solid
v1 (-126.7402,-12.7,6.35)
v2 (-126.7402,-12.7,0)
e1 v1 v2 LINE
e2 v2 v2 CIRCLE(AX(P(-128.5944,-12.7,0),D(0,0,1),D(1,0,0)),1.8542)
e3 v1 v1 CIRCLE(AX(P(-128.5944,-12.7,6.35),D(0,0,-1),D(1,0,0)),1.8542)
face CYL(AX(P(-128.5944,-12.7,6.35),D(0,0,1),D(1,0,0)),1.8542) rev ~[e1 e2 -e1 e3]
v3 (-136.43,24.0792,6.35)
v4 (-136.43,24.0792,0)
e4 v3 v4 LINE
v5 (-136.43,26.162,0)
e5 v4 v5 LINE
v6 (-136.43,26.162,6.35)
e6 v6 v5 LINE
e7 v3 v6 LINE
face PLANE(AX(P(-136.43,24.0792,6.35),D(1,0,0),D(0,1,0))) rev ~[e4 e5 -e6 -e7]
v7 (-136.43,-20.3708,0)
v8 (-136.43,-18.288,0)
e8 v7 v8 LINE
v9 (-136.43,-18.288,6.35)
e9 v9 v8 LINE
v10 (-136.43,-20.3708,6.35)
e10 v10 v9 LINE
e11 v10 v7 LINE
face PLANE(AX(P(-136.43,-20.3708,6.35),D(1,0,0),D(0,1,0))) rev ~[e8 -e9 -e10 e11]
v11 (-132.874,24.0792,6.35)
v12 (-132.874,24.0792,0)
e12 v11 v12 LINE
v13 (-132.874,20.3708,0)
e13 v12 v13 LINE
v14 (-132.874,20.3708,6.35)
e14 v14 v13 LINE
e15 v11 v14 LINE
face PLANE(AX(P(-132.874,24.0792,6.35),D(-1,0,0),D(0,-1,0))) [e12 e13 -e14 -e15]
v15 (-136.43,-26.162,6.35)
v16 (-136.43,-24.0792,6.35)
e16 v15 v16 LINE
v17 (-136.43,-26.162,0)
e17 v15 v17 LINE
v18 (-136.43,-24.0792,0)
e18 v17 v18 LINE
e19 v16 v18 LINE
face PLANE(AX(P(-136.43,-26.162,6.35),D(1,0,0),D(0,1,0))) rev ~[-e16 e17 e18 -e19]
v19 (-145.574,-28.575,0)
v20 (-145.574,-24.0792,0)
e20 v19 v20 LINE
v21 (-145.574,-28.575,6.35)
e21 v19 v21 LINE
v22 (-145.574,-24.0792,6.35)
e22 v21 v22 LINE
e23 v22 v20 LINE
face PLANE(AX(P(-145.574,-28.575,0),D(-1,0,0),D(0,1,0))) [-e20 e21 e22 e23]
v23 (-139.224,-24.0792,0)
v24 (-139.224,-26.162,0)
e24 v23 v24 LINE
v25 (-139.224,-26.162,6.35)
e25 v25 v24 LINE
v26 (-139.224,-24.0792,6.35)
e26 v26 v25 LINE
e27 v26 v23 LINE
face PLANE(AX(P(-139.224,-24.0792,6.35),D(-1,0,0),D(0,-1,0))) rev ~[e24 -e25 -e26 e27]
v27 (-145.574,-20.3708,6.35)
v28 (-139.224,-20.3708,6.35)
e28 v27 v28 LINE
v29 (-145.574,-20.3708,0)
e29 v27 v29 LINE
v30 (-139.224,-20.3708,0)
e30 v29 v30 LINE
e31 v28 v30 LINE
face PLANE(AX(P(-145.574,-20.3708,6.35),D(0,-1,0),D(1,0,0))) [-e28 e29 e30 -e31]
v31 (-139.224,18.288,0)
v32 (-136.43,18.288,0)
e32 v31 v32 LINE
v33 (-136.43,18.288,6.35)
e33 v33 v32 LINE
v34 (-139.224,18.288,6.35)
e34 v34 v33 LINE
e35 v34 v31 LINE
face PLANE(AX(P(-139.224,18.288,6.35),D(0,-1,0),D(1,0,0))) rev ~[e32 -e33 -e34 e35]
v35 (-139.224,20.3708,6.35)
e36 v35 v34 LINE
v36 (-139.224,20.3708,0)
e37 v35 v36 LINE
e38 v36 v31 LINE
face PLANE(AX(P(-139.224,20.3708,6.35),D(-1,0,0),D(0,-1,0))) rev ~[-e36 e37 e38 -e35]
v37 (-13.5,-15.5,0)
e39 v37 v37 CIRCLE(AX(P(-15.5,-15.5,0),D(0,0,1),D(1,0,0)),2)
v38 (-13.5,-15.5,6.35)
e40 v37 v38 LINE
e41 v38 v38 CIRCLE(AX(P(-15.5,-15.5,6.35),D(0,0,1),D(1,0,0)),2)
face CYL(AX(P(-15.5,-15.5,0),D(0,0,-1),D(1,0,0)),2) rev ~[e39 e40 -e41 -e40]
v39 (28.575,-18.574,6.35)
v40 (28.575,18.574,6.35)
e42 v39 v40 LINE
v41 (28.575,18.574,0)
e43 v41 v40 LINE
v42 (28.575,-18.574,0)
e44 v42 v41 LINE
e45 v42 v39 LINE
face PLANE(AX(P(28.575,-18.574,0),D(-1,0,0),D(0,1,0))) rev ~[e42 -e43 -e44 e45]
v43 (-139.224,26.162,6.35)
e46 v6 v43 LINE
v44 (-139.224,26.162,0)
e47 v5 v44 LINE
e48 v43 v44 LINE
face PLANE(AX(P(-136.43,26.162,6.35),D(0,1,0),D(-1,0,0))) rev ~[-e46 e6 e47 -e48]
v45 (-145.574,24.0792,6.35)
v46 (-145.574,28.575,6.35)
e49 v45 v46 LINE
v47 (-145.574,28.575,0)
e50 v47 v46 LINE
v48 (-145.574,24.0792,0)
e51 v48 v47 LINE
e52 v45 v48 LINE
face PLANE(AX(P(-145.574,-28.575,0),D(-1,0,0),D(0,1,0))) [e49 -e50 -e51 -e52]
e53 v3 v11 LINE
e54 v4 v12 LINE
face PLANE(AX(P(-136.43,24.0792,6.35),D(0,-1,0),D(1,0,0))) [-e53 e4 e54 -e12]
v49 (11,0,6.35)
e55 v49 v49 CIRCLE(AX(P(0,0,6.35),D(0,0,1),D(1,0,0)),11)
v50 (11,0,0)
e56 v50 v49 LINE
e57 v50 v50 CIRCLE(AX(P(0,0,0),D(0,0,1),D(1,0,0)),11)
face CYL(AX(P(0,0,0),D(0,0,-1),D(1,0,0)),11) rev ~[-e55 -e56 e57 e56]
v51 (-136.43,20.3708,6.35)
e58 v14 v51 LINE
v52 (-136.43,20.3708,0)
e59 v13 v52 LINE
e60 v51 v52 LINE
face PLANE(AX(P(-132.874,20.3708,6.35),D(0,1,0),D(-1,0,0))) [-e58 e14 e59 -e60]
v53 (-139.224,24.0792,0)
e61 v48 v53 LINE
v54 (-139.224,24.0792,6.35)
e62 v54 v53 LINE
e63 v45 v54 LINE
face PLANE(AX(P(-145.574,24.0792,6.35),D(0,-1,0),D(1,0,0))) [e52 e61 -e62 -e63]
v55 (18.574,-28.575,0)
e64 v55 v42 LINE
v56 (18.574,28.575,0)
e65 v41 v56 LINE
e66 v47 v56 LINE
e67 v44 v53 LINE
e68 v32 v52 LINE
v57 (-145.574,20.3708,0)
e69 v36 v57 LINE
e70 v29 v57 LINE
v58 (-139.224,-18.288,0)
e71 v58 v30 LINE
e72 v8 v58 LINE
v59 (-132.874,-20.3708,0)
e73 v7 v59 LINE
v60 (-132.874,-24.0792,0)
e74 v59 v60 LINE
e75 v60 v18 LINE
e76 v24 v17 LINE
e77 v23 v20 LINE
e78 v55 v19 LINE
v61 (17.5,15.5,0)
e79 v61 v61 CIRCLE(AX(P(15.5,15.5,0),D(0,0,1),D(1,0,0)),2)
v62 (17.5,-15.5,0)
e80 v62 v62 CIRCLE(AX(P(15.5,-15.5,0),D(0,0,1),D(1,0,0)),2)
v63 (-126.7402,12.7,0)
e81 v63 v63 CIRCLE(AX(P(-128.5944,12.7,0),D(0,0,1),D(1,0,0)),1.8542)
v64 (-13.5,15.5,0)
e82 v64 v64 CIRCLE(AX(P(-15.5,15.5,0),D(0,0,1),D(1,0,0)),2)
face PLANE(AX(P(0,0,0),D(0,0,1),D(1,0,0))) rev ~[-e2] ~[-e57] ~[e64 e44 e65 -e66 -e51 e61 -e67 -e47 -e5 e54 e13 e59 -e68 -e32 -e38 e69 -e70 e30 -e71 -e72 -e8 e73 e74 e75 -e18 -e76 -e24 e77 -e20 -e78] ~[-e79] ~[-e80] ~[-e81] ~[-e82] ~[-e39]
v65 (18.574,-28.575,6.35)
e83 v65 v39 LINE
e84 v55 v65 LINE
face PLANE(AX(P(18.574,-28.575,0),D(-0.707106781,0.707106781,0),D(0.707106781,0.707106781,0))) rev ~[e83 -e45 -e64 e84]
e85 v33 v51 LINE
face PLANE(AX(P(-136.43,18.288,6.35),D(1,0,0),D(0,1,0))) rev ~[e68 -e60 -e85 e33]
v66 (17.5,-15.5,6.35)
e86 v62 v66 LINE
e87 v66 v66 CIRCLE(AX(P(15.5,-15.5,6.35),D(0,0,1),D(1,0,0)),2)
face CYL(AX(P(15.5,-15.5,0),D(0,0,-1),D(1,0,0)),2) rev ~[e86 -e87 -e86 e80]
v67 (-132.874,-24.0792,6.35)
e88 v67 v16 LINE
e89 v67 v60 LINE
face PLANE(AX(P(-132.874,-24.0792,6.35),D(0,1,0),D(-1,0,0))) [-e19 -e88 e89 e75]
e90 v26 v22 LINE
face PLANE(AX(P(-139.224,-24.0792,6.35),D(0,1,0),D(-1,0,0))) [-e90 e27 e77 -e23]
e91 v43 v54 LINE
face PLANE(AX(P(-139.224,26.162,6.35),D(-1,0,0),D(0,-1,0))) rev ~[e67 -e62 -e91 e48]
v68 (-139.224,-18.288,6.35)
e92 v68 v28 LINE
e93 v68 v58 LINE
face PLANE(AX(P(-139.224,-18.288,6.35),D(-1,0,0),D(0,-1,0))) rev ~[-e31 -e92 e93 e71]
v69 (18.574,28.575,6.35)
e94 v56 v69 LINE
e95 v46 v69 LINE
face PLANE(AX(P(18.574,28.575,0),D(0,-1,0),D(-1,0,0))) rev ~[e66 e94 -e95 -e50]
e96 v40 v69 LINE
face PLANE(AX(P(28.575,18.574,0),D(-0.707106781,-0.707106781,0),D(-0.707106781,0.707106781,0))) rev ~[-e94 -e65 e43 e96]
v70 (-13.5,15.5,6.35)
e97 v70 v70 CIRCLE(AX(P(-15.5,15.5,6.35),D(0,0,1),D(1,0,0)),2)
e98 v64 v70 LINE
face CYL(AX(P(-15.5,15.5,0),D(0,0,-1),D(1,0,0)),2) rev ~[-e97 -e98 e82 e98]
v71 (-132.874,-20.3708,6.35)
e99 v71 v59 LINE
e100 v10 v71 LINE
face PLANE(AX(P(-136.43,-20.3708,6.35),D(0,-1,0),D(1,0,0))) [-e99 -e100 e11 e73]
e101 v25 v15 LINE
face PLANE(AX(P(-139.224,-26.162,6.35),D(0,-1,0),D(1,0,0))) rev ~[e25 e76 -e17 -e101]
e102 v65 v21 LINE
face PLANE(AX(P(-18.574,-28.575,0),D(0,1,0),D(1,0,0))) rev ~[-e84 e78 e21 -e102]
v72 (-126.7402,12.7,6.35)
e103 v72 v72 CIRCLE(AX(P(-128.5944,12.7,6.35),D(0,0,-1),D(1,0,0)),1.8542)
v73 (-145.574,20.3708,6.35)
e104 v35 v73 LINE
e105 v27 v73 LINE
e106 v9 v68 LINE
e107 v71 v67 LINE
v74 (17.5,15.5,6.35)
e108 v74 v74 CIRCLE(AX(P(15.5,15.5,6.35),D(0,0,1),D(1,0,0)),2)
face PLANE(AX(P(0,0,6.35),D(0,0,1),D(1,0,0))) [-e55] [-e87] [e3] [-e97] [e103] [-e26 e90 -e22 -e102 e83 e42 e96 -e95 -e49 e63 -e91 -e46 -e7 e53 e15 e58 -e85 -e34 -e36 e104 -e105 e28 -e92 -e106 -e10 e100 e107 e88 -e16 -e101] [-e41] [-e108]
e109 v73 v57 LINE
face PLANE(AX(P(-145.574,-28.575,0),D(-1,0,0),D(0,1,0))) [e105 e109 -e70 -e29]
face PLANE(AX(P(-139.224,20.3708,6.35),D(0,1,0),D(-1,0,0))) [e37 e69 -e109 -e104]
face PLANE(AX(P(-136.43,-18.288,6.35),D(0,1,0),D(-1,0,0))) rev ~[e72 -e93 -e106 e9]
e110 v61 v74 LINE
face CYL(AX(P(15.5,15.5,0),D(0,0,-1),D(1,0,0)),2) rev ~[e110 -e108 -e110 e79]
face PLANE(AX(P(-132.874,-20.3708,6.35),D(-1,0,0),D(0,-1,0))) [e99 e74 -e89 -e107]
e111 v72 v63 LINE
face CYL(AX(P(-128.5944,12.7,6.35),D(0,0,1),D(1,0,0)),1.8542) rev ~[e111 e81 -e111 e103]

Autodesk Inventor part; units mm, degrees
ref_plane "YZ Plane" through (0, 0, 0) normal (1, 0, 0) x (0, 1, 0)
ref_plane "XZ Plane" through (0, 0, 0) normal (0, 1, 0) x (-1, 0, 0)
ref_plane "XY Plane" through (0, 0, 0) normal (0, 0, 1) x (1, 0, 0)
sketch "Sketch1" plane through (0, 0, 0) normal (0, 0, 1) x (1, 0, 0)
  circle A0 centre (15.5, -15.5) radius 2 projected
  circle A1 centre (-15.5, -15.5) radius 2 projected
  circle A2 centre (15.5, 15.5) radius 2 projected
  circle A3 centre (-15.5, 15.5) radius 2 projected
  line L0 (-21.15, 15.4985) -> (-15.4985, 21.15) projected
  line L1 (-15.4985, 21.15) -> (15.4985, 21.15) projected
  line L2 (15.4985, 21.15) -> (21.15, 15.4985) projected
  line L3 (21.15, 15.4985) -> (21.15, -15.4985) projected
  line L4 (21.15, -15.4985) -> (15.4985, -21.15) projected
  line L5 (15.4985, -21.15) -> (-15.4985, -21.15) projected
  line L6 (-15.4985, -21.15) -> (-21.15, -15.4985) projected
  line L7 (-21.15, -15.4985) -> (-21.15, 15.4985) projected
  line L8 (28.575, -18.574) -> (28.575, 18.574)
  line L9 (28.575, 18.574) -> (18.574, 28.575)
  line L10 (18.574, 28.575) -> (-18.574, 28.575)
  line L11 (-18.574, 28.575) -> (-28.575, 18.574)
  line L12 (-28.575, 18.574) -> (-28.575, -18.574)
  line L13 (-28.575, -18.574) -> (-18.574, -28.575)
  line L14 (-18.574, -28.575) -> (18.574, -28.575)
  line L15 (18.574, -28.575) -> (28.575, -18.574)
  line L16 (-18.574, -28.575) -> (-145.574, -28.575)
  line L17 (-145.574, -28.575) -> (-145.574, 28.575)
  line L18 (-145.574, 28.575) -> (-18.574, 28.575)
  line L19 (-18.574, 28.575) -> (-18.574, -28.575)
  circle A4 centre (0, 0) radius 11 projected
  dimension "d0" = 127
  dimension "d1" = 57.15
  dimension "d2" = 57.15
extrude "Extrusion1" add sketch "Sketch1" along normal blind 6.35
sketch "Sketch2" plane through (0, 0, 6.35) normal (0, 0, 1) x (1, 0, 0)
  line L0 (-130.4486, -16.3493) -> (-130.4486, -9.9993) projected
  line L1 (-126.7402, -9.9993) -> (-126.7402, -16.3493) projected
  line L2 (-130.4486, 9.0507) -> (-130.4486, 15.4007) projected
  line L3 (-126.7402, 15.4007) -> (-126.7402, 9.0507) projected
  line L4 (-126.7402, 12.7) -> (-130.4486, 12.7) construction
  line L5 (-126.7402, -12.7) -> (-130.9009, -12.7) construction
  circle A0 centre (-128.5944, 12.7) radius 1.8542
  circle A1 centre (-128.5944, -12.7) radius 1.8542
  dimension "d5" = 3.7084
  dimension "d6" = 3.7084
extrude "Extrusion2" cut sketch "Sketch2" against normal through all
sketch "Sketch3" plane through (0, 0, 6.35) normal (0, 0, 1) x (1, 0, 0)
  line L0 (-145.574, -28.575) -> (-145.574, 28.575) projected
  line L1 (-151.924, 20.3708) -> (-151.924, 24.0792) projected
  line L2 (-151.924, -24.5535) -> (-151.924, -20.8451) projected
  line L3 (-131.1543, 22.225) -> (-145.574, 22.225) construction
  line L4 (-131.1543, -22.225) -> (-145.574, -22.225) construction
  line L5 (-145.574, -20.3708) -> (-132.874, -20.3708)
  line L6 (-132.874, -20.3708) -> (-132.874, -24.0792)
  line L7 (-132.874, -24.0792) -> (-145.574, -24.0792)
  line L8 (-145.574, -24.0792) -> (-145.574, -20.3708)
  line L9 (-145.574, 24.0792) -> (-132.874, 24.0792)
  line L10 (-132.874, 24.0792) -> (-132.874, 20.3708)
  line L11 (-132.874, 20.3708) -> (-145.574, 20.3708)
  line L12 (-145.574, 20.3708) -> (-145.574, 24.0792)
  line L13 (-136.43, 26.162) -> (-139.224, 26.162)
  line L14 (-139.224, 26.162) -> (-139.224, 18.288)
  line L15 (-139.224, 18.288) -> (-136.43, 18.288)
  line L16 (-136.43, 18.288) -> (-136.43, 26.162)
  line L17 (-136.43, -18.288) -> (-139.224, -18.288)
  line L18 (-139.224, -18.288) -> (-139.224, -26.162)
  line L19 (-139.224, -26.162) -> (-136.43, -26.162)
  line L20 (-136.43, -26.162) -> (-136.43, -18.288)
  dimension "d9" = 12.7
  dimension "d10" = 2.794
  dimension "d11" = 7.874
  dimension "d12" = 3.937
  dimension "d13" = 3.937
  dimension "d14" = 7.874
  dimension "d15" = 3.937
  dimension "d16" = 3.937
  dimension "d17" = 6.35
  dimension "d18" = 6.35
  dimension "d19" = 2.794
extrude "Extrusion3" cut sketch "Sketch3" against normal through all
equation "\"d2\" = d1"
equation "\"d12\" = d13"
equation "\"d15\" = d16"
properties part number "tiltColumnNonStepperSide02" material "Titanium"
